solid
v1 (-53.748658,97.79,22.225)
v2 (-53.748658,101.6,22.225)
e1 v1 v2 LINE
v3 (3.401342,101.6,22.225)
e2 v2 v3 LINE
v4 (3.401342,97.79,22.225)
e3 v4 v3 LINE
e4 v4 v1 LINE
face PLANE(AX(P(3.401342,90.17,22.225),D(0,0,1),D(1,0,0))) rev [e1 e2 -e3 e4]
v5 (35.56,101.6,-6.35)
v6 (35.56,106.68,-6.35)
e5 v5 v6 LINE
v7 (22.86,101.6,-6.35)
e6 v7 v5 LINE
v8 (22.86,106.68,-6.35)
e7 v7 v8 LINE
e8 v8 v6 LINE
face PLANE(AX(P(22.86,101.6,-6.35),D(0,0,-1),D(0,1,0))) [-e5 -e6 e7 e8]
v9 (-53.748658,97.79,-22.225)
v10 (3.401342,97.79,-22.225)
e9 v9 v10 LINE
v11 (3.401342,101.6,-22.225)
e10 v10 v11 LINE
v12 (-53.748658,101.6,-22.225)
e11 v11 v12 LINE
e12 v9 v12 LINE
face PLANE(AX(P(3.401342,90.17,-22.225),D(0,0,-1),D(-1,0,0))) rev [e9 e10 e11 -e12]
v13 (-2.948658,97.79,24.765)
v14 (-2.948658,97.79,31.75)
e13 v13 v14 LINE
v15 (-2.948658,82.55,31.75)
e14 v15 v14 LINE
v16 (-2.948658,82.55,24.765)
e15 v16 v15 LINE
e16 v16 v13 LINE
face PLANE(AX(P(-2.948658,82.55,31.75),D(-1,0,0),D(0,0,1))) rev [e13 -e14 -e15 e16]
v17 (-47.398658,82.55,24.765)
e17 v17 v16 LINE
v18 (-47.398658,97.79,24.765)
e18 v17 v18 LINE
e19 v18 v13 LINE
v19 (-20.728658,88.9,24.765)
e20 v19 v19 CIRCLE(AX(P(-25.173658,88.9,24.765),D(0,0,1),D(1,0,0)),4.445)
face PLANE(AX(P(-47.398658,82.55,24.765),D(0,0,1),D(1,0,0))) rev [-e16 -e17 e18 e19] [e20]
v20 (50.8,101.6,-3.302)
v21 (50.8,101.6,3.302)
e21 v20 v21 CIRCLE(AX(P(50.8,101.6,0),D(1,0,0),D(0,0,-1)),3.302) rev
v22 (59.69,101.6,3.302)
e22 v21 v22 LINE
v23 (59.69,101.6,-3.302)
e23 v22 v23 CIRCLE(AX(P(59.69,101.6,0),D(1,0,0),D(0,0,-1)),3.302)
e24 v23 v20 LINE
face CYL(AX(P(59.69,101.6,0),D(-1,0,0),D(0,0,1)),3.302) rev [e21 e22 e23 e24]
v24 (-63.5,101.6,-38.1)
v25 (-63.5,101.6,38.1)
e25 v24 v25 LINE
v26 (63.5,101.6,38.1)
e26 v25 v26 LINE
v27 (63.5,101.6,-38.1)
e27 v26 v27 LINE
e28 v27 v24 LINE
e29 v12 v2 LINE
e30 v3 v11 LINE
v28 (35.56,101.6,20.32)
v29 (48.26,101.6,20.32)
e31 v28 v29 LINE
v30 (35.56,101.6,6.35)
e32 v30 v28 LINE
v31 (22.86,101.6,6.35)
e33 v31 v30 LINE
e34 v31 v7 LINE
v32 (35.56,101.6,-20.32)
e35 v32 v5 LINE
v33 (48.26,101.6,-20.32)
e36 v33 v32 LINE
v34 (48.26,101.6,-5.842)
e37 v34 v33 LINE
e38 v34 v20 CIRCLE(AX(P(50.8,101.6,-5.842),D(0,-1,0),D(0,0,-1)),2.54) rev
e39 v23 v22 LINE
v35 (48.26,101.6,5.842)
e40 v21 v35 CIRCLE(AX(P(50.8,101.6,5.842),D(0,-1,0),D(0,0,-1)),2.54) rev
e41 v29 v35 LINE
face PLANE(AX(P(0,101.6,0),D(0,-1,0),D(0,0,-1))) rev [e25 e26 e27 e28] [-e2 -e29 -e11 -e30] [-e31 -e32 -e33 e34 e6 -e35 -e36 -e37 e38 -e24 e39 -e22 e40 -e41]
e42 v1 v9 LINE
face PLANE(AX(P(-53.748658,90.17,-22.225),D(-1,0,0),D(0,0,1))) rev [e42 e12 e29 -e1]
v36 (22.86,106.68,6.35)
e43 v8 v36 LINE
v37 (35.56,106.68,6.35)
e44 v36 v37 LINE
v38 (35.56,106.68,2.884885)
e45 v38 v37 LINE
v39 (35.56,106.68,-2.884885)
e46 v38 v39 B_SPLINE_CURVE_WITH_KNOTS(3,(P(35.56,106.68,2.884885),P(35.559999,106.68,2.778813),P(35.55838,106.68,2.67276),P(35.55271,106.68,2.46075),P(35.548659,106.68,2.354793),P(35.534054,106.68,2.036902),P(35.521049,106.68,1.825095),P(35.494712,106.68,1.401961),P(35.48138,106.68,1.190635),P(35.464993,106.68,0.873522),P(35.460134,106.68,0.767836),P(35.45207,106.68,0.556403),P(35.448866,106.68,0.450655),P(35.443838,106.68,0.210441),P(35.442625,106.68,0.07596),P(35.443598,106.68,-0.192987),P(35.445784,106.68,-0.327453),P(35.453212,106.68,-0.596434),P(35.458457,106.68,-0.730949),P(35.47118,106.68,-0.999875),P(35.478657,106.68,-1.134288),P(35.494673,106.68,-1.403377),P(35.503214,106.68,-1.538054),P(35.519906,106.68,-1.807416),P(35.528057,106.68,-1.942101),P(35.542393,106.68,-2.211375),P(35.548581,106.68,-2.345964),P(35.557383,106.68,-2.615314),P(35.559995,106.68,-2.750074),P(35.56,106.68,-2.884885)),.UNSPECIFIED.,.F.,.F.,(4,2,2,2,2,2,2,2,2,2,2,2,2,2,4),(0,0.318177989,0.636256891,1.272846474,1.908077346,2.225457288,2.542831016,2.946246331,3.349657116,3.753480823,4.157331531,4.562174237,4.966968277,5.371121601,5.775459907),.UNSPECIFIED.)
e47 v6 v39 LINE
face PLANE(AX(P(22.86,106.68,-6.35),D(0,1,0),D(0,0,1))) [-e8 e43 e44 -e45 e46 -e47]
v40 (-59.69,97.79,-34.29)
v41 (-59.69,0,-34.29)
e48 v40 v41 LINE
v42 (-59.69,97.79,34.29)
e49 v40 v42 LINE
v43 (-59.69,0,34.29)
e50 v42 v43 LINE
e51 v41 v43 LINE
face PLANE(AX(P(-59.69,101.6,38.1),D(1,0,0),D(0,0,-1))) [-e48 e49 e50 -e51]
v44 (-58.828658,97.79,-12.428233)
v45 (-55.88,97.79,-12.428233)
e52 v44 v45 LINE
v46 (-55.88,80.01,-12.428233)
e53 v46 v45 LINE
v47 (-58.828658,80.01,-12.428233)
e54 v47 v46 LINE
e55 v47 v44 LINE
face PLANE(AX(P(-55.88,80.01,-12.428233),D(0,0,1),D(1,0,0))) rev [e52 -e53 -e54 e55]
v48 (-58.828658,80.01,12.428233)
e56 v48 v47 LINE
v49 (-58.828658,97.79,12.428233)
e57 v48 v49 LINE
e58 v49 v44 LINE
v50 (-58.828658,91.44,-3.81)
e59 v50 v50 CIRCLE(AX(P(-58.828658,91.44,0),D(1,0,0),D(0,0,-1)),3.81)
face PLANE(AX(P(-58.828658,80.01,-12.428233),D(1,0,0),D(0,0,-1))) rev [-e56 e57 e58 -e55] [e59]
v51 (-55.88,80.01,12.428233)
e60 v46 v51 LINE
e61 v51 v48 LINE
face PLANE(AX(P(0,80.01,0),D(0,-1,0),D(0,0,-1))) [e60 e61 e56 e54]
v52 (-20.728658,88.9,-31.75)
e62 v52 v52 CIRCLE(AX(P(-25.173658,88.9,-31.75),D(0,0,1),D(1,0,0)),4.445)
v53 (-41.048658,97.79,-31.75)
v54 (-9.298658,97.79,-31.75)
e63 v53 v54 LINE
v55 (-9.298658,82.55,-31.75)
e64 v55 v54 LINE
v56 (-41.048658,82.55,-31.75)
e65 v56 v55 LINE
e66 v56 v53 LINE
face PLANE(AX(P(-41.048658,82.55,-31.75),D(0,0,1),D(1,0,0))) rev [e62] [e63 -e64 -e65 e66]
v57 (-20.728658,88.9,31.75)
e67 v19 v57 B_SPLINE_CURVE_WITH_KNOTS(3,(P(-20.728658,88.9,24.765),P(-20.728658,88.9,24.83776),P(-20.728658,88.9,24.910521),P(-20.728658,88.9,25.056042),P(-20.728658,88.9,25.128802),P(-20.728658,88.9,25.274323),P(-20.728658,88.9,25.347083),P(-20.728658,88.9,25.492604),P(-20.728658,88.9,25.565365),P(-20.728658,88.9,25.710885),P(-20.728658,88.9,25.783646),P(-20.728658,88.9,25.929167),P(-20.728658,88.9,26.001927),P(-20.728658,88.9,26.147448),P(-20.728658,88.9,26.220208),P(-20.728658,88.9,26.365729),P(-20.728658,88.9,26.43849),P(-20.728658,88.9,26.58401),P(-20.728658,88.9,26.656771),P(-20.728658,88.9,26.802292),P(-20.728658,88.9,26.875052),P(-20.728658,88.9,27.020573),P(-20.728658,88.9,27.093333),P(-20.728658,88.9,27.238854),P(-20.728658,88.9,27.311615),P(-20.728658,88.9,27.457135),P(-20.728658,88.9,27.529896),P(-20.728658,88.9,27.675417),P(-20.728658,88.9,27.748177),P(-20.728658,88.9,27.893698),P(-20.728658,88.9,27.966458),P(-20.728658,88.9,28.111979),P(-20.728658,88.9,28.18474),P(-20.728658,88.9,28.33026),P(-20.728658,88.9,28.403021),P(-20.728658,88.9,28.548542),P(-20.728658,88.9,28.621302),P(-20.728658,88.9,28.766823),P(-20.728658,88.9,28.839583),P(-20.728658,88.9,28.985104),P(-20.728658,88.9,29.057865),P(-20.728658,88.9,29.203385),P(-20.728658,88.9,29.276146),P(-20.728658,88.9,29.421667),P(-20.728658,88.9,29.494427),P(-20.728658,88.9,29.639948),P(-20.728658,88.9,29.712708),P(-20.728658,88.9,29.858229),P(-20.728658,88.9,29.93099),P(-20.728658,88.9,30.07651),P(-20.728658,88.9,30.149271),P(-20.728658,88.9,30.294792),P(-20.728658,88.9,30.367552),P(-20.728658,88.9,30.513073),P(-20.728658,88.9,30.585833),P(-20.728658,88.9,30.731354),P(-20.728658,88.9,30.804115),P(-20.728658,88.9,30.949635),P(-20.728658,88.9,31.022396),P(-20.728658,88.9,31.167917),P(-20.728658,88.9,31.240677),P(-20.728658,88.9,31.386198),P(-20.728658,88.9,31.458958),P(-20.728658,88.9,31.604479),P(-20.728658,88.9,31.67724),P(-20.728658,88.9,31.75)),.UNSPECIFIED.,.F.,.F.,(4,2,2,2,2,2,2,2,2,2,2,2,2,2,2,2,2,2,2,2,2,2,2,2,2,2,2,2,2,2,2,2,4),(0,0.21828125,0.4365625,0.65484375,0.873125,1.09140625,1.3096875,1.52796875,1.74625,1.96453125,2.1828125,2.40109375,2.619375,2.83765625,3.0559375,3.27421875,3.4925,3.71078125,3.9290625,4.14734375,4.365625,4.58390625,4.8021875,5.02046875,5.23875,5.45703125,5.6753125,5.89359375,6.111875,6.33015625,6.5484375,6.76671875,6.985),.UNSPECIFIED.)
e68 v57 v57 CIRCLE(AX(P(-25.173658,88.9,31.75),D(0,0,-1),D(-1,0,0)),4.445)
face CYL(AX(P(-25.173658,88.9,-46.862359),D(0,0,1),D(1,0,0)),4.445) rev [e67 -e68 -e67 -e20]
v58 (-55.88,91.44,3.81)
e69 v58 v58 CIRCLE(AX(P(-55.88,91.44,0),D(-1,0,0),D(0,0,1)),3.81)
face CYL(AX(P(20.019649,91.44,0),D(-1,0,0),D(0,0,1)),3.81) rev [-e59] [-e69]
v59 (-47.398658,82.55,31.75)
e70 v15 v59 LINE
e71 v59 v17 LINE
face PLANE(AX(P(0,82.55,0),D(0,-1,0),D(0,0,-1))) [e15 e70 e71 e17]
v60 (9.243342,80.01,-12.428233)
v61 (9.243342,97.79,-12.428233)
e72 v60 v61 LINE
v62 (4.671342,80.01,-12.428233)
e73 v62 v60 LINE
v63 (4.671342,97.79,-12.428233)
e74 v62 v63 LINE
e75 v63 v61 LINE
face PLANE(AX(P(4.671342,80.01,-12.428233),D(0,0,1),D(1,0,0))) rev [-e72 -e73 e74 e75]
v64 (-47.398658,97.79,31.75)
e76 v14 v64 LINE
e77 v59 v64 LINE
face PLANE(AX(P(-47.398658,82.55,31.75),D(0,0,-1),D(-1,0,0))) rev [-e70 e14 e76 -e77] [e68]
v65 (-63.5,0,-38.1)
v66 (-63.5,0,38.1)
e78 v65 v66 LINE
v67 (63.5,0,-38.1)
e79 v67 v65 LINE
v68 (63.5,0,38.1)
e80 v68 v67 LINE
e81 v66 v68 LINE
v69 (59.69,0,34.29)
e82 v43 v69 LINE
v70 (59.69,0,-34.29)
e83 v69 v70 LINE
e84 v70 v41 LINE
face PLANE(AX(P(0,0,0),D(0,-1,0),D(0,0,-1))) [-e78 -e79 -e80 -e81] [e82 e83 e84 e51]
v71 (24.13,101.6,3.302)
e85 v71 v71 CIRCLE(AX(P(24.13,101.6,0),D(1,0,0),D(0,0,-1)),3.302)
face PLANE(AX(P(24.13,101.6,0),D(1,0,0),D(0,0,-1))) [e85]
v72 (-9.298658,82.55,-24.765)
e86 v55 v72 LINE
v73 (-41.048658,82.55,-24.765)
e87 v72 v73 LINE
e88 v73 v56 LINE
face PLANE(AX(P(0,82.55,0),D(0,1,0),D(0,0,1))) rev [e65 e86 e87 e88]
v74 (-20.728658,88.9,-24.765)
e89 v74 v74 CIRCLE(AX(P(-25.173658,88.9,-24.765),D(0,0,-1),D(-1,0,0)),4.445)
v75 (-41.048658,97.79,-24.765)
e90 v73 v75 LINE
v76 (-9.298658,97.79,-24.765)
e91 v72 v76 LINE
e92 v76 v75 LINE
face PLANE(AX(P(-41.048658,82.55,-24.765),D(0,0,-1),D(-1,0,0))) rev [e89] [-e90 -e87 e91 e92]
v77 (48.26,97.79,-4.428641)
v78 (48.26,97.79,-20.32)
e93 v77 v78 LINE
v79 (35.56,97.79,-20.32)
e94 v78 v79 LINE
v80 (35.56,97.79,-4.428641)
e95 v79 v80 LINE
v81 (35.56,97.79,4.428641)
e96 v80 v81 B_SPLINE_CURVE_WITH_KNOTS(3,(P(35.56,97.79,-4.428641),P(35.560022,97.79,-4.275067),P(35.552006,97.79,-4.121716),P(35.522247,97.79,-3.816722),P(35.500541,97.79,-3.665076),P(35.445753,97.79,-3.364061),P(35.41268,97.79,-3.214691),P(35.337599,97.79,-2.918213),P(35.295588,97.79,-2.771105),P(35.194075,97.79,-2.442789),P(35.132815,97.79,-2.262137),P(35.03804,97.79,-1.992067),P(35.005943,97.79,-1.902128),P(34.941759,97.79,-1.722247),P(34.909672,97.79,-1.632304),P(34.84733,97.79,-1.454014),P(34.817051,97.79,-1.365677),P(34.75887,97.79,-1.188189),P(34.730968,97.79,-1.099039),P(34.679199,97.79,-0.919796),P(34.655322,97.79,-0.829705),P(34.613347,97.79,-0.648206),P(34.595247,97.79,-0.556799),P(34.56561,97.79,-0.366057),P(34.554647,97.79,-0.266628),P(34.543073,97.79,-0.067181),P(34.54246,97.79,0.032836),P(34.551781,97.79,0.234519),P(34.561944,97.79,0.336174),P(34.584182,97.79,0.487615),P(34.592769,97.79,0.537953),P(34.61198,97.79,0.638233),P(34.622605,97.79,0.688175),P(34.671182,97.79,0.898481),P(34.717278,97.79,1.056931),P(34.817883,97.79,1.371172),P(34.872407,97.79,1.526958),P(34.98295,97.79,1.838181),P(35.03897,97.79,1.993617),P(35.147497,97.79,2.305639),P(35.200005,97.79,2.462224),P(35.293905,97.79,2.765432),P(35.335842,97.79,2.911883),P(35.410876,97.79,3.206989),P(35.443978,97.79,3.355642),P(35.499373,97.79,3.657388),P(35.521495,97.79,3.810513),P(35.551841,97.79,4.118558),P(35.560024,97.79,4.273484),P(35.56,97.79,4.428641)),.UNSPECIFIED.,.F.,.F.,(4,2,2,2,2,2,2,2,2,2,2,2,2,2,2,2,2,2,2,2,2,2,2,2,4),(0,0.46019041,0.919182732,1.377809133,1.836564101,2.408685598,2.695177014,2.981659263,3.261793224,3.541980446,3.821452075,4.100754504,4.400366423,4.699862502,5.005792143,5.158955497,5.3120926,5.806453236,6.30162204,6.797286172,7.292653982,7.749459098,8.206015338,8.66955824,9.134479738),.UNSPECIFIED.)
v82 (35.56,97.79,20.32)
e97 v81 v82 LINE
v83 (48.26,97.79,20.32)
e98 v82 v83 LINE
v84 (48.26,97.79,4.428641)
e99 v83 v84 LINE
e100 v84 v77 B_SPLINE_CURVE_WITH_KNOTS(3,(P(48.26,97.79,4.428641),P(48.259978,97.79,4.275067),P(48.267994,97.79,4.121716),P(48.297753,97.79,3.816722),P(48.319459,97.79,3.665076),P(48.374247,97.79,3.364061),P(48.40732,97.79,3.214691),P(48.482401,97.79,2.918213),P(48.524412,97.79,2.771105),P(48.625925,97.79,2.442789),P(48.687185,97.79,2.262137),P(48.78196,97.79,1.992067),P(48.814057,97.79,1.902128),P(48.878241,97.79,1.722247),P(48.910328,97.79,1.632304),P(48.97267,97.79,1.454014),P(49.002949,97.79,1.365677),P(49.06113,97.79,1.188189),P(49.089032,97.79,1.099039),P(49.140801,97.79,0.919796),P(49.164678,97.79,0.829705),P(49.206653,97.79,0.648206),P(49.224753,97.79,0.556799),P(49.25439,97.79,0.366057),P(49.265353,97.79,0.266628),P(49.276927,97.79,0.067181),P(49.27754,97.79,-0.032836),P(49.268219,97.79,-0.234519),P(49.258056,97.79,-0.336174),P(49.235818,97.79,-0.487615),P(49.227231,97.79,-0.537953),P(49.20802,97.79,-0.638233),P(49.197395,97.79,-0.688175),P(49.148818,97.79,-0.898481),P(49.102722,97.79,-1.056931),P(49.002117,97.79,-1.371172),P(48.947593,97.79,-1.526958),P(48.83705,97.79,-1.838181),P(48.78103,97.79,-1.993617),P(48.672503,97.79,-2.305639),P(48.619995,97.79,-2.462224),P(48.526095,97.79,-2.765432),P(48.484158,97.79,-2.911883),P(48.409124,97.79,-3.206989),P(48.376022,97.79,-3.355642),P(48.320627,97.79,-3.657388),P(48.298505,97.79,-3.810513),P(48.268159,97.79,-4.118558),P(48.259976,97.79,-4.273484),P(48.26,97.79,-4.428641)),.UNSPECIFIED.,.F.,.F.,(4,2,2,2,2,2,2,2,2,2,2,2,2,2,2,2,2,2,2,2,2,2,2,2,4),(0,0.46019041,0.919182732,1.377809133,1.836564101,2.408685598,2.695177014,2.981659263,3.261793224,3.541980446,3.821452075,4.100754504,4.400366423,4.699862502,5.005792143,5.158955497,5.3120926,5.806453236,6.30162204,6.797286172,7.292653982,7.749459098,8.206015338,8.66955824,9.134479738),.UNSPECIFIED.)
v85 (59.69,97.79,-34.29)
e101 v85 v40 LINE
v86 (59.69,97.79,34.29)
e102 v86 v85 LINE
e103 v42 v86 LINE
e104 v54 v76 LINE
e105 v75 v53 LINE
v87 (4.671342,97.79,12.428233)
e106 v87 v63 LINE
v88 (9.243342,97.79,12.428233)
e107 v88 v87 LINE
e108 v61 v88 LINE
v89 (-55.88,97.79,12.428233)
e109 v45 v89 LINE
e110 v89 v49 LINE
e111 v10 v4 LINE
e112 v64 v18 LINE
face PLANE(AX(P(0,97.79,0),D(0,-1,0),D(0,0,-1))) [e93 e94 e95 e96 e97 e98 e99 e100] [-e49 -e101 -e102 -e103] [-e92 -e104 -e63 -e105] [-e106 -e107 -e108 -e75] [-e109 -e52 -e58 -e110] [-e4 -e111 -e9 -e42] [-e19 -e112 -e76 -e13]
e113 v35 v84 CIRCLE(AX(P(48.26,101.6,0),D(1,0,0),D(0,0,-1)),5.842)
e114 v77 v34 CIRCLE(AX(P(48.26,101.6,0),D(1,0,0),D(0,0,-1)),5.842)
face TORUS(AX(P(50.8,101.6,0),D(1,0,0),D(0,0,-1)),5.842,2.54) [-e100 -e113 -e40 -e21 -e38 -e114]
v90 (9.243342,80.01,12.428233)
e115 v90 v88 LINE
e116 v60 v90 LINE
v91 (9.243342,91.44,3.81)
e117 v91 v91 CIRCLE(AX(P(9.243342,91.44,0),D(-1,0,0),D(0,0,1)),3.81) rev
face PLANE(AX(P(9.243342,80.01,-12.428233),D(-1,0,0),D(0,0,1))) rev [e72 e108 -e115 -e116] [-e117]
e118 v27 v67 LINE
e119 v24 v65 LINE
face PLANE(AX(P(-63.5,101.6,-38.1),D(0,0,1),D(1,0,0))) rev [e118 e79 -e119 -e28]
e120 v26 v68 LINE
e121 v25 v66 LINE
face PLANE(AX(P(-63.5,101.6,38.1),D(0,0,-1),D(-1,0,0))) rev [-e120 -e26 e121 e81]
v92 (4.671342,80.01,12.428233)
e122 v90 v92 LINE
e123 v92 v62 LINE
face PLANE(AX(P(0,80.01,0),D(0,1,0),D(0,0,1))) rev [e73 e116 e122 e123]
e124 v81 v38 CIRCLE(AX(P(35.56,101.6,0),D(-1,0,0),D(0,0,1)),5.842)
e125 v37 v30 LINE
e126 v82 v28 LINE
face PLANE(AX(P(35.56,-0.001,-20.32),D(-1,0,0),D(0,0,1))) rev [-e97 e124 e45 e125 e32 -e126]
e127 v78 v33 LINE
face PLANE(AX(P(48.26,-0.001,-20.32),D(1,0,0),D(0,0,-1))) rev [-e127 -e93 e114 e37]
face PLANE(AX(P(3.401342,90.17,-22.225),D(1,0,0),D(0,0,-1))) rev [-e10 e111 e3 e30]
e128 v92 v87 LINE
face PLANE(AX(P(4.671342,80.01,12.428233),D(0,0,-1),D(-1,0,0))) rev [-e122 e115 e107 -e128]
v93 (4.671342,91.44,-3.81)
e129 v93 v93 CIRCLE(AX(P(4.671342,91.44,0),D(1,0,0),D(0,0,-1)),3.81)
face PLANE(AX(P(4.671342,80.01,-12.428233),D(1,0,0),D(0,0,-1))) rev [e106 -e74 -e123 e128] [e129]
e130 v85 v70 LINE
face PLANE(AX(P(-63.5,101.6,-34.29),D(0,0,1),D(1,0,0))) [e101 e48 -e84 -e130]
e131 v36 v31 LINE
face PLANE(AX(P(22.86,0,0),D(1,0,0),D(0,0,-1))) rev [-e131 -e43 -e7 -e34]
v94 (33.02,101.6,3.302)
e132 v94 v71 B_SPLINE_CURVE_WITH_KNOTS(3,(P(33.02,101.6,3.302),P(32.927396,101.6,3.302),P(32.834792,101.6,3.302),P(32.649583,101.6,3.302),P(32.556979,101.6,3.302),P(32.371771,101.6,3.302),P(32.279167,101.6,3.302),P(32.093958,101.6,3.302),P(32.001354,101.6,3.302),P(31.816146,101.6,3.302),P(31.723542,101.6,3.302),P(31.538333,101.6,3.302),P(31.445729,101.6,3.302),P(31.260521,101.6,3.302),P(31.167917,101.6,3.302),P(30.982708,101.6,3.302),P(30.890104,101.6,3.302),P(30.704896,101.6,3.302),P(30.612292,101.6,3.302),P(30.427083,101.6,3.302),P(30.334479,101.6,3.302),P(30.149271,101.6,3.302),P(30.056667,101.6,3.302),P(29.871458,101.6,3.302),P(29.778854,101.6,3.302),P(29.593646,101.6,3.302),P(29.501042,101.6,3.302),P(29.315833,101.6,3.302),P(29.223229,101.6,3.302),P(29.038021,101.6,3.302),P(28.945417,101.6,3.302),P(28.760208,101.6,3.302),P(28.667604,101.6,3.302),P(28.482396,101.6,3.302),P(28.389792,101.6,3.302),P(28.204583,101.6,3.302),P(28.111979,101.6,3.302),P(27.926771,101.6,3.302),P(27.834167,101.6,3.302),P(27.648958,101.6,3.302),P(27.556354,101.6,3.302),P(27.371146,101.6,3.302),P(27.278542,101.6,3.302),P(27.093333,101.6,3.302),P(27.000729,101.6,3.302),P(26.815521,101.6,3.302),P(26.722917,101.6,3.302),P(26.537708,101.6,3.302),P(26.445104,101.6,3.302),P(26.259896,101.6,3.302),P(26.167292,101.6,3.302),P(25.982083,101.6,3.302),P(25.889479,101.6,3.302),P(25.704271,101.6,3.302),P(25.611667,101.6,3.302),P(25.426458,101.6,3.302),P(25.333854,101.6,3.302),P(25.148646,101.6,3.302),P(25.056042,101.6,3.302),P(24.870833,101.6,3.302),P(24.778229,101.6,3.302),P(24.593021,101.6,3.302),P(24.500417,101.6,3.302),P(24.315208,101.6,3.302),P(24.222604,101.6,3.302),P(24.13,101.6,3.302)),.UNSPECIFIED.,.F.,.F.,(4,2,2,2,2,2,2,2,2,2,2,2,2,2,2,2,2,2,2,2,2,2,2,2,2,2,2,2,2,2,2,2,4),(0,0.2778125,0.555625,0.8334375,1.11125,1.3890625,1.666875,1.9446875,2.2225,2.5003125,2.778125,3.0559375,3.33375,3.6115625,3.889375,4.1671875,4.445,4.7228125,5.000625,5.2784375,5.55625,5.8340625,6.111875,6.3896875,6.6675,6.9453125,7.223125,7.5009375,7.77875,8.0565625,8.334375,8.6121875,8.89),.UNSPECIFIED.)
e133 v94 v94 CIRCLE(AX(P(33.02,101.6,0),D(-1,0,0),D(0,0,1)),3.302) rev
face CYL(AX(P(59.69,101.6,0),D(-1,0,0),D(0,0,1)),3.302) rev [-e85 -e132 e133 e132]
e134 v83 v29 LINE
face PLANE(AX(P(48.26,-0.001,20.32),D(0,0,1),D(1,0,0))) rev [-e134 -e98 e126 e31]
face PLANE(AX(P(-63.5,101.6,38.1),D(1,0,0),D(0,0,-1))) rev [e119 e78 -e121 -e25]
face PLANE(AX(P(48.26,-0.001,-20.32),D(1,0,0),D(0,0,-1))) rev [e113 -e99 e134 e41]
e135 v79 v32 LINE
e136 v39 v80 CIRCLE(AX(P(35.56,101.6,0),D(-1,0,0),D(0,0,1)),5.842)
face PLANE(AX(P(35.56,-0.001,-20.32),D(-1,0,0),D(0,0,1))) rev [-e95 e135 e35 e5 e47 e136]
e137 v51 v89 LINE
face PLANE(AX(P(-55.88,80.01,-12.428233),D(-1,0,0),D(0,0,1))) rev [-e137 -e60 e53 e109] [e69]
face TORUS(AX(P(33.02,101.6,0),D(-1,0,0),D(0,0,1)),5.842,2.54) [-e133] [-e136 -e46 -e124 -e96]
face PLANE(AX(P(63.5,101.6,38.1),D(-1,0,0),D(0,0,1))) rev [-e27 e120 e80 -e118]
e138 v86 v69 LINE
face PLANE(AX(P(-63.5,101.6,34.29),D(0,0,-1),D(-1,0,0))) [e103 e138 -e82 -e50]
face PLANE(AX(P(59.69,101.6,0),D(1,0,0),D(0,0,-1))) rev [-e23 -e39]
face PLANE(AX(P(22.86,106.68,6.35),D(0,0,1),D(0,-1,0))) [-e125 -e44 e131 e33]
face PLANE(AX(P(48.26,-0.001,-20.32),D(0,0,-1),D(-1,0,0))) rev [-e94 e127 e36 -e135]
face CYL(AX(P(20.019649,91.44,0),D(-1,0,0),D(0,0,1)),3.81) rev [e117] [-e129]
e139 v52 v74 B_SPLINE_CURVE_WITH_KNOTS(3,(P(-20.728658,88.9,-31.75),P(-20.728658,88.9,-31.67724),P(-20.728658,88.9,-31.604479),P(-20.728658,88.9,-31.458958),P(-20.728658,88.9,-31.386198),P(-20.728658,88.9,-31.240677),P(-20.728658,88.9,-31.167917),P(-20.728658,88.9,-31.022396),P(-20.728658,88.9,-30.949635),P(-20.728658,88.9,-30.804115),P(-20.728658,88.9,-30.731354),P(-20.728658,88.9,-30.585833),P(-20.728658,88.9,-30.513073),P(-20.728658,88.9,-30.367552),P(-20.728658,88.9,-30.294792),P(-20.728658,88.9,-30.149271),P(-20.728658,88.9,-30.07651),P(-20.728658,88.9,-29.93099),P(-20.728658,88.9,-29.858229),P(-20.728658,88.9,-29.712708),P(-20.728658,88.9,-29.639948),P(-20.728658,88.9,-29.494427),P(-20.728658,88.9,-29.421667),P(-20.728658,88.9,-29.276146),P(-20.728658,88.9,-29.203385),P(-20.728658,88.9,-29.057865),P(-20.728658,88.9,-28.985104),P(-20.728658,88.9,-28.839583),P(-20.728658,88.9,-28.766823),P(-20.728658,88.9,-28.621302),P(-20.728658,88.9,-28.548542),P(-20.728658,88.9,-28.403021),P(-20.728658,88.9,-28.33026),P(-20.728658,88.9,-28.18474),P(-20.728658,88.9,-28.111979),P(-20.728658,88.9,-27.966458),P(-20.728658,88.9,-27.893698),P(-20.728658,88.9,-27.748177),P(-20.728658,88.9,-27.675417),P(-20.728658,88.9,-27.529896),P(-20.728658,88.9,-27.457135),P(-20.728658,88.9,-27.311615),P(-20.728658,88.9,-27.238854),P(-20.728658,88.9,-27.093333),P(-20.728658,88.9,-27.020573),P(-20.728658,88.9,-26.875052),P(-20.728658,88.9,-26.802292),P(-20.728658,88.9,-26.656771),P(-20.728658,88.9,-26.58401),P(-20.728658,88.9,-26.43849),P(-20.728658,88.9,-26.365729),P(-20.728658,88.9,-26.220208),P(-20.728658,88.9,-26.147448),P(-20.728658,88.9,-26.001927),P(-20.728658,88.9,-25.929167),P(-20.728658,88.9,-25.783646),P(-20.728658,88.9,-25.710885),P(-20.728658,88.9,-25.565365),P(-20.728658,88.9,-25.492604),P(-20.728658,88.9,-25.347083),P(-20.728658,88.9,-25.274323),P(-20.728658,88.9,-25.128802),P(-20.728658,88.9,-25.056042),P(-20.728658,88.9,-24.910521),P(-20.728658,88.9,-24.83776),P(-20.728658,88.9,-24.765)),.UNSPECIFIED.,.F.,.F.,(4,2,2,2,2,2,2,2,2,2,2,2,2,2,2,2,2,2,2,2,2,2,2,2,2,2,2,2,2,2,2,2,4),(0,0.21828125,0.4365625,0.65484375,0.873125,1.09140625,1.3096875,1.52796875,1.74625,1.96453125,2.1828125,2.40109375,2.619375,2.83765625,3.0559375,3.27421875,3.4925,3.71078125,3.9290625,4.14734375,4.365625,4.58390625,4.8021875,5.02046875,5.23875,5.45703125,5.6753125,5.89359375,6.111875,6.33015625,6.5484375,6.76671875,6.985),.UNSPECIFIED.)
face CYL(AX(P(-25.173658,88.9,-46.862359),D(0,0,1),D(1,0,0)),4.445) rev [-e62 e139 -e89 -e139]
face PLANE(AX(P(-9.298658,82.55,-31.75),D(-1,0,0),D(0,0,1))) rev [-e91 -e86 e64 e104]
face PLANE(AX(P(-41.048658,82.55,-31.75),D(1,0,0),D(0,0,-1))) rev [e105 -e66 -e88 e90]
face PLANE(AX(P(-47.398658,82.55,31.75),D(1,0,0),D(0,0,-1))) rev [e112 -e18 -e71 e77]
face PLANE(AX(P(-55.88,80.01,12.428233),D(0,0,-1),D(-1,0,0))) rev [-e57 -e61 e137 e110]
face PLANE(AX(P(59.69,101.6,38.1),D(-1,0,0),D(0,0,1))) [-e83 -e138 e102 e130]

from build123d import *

# Parameters (mm, degrees)
SKETCH1_W                           = 127
SKETCH1_H                           = 76.2
MAIN_BODY_DEPTH                     = 101.6
HOLLOW_IT_T                         = -3.81
HOLE_FOR_SCROLLWHEEL_REACH          = 127.724
SKETCH2_W                           = 12.7
SKETCH2_H                           = 40.64
NIBBLE_BASE_HOLE_DEPTH              = 12.7
NIBBLE_HOLE_DEPTH                   = 24.13
NIBBLE_HOLE_DEPTH_BACK              = 11.43
SKETCH5_R                           = 3.302
EASY_TO_INSERT_SCROLL_WHEEL_R       = 2.54
SKETCH6_W                           = 57.15
SKETCH6_H                           = 44.45
HOLE_FOR_JOYSTICK_DEPTH             = 11.43
SKETCH10_W                          = 44.45
SKETCH10_H                          = 6.985
SKETCH10_W_2                        = 31.75
BOX_NIBBLE_BASE_DEPTH               = 15.24
SKETCH11_W                          = 4.572
SKETCH11_H                          = 24.856466434
SKETCH11_W_2                        = 2.948658359
ARCH_NIBBLE_BASE_DEPTH              = 17.78
ARCH_NIBBLE_HOLES_REACH             = 134.21
SKETCH12_R                          = 3.81
ARCH_NIBBLE_HOLES_DIRECTION_2_REACH = 134.21
BOX_NIBBLE_HOLES_REACH              = 141.158
SKETCH13_R                          = 4.445
BOX_NIBBLE_HOLES_DIRECTION_2_REACH  = 141.158


with BuildPart() as part:
    # Sketch1 → main body (new body)
    with BuildSketch(Plane(origin=(0, 0, 0), x_dir=(1, 0, 0), z_dir=(0, 1, 0))):
        Rectangle(SKETCH1_W, SKETCH1_H)
    extrude(amount=MAIN_BODY_DEPTH)

    # hollow it
    hollow_it_openings = [part.faces().sort_by_distance(p)[0] for p in [
        (0, 0, 0),
    ]]
    offset(amount=HOLLOW_IT_T, openings=hollow_it_openings, kind=Kind.INTERSECTION)

    # Sketch2 → hole for scrollwheel (cut, up to next)
    with BuildSketch(Plane(origin=(0, 101.6, 0), x_dir=(1, 0, 0), z_dir=(0, 1, 0)), mode=Mode.PRIVATE) as hole_for_scrollwheel_sk1:
        with Locations((41.91, 0)):
            Rectangle(SKETCH2_W, SKETCH2_H)
    hole_for_scrollwheel_tool1 = extrude(hole_for_scrollwheel_sk1.sketch, amount=-HOLE_FOR_SCROLLWHEEL_REACH, mode=Mode.PRIVATE) & part.part
    add(hole_for_scrollwheel_tool1.solids().sort_by_distance((41.91, 101.6, 0))[0], mode=Mode.SUBTRACT)

    # Sketch3 → nibble base hole (add)
    with BuildSketch(Plane(origin=(35.56, 0, 0), x_dir=(0, 0, -1), z_dir=(1, 0, 0))):
        Polygon((0, 101.6), (6.35, 101.6), (6.35, 106.68), (-6.35, 106.68), (-6.35, 101.6), align=None)
    extrude(amount=-NIBBLE_BASE_HOLE_DEPTH)

    # Sketch5 → nibble hole (cut, two sides: drawn at the far end of the back side and taken through both)
    with BuildSketch(Plane(origin=(35.56, 0, 0), x_dir=(0, 0, -1), z_dir=(1, 0, 0)).offset(-NIBBLE_HOLE_DEPTH_BACK)):
        with Locations(Location((0, 101.6, 0), (0, 0, 180))):
            Circle(SKETCH5_R)
    extrude(amount=NIBBLE_HOLE_DEPTH + NIBBLE_HOLE_DEPTH_BACK, mode=Mode.SUBTRACT)

    # easy to insert scroll wheel
    # the kernel refuses this fillet: 2.54 mm, written as the material it takes off along each edge
    with BuildSketch(Plane(origin=(48.26, 101.6, 0), x_dir=(0, 0.9999950652018582, -0.0031415874858792044), z_dir=(0, 0.0031415874858792044, 0.9999950652018582))) as easy_to_insert_scroll_wheel_piece_1:
        with BuildLine():
            CenterArc((3.302 + EASY_TO_INSERT_SCROLL_WHEEL_R, -EASY_TO_INSERT_SCROLL_WHEEL_R), EASY_TO_INSERT_SCROLL_WHEEL_R, 90, 90)
            Line((3.302, -EASY_TO_INSERT_SCROLL_WHEEL_R), (3.302, 0))
            Line((3.302, 0), (3.302 + EASY_TO_INSERT_SCROLL_WHEEL_R, 0))
        make_face()
    revolve(axis=Axis((48.26, 101.6, 0), (-1, 0, 0)), revolution_arc=359.64, mode=Mode.SUBTRACT)
    with BuildSketch(Plane(origin=(35.56, 101.6, 0), x_dir=(0, 0, 1), z_dir=(0, 1, 0))) as easy_to_insert_scroll_wheel_piece_2:
        with BuildLine():
            CenterArc((3.302 + EASY_TO_INSERT_SCROLL_WHEEL_R, -EASY_TO_INSERT_SCROLL_WHEEL_R), EASY_TO_INSERT_SCROLL_WHEEL_R, 90, 90)
            Line((3.302, -EASY_TO_INSERT_SCROLL_WHEEL_R), (3.302, 0))
            Line((3.302, 0), (3.302 + EASY_TO_INSERT_SCROLL_WHEEL_R, 0))
        make_face()
    revolve(axis=Axis((35.56, 101.6, 0), (1, 0, 0)), mode=Mode.SUBTRACT)

    # Sketch6 → hole for joystick (cut)
    with BuildSketch(Plane(origin=(0, 101.6, 0), x_dir=(1, 0, 0), z_dir=(0, 1, 0))):
        with Locations((-25.173658359, 0)):
            Rectangle(SKETCH6_W, SKETCH6_H)
    extrude(amount=-HOLE_FOR_JOYSTICK_DEPTH, mode=Mode.SUBTRACT)

    # Sketch10 → box nibble base (add)
    with BuildSketch(Plane.XZ.offset(-97.79)):
        with Locations((-25.173658359, 28.2575)):
            Rectangle(SKETCH10_W, SKETCH10_H)
        with Locations((-25.173658359, -28.2575)):
            Rectangle(SKETCH10_W_2, SKETCH10_H)
    extrude(amount=BOX_NIBBLE_BASE_DEPTH)

    # Sketch11 → arch nibble base (add)
    with BuildSketch(Plane.XZ.offset(-97.79)):
        with Locations((6.957341641, 0)):
            Rectangle(SKETCH11_W, SKETCH11_H)
        with Locations((-57.354329179, 0)):
            Rectangle(SKETCH11_W_2, SKETCH11_H)
    extrude(amount=ARCH_NIBBLE_BASE_DEPTH)

    # arch nibble holes: up to this face of the body (flat: up to its plane)
    arch_nibble_holes_end = Plane(part.part.faces().sort_by_distance((9.243341641, 88.9, 0))[0])
    # Sketch12 → arch nibble holes (cut, up to the picked face)
    with BuildSketch(Plane.ZY.offset(-4.671341641), mode=Mode.PRIVATE) as arch_nibble_holes_sk1:
        with Locations((0, 91.44)):
            Circle(SKETCH12_R)
    arch_nibble_holes_tool1 = split(extrude(arch_nibble_holes_sk1.sketch, amount=-ARCH_NIBBLE_HOLES_REACH, mode=Mode.PRIVATE), bisect_by=arch_nibble_holes_end, keep=Keep.BOTH, mode=Mode.PRIVATE)
    add(arch_nibble_holes_tool1.solids().sort_by(Axis((4.671342, 91.44, 0), (1, 0, 0)))[0], mode=Mode.SUBTRACT)

    # arch nibble holes direction 2: up to this face of the body (flat: up to its plane)
    arch_nibble_holes_direction_2_end = Plane(part.part.faces().sort_by_distance((-59.69, 48.895, 0))[0])
    # Sketch12 → arch nibble holes direction 2 (cut, up to the picked face)
    with BuildSketch(Plane.ZY.offset(-4.671341641), mode=Mode.PRIVATE) as arch_nibble_holes_direction_2_sk1:
        with Locations((0, 91.44)):
            Circle(SKETCH12_R)
    arch_nibble_holes_direction_2_tool1 = split(extrude(arch_nibble_holes_direction_2_sk1.sketch, amount=ARCH_NIBBLE_HOLES_DIRECTION_2_REACH, mode=Mode.PRIVATE), bisect_by=arch_nibble_holes_direction_2_end, keep=Keep.BOTH, mode=Mode.PRIVATE)
    add(arch_nibble_holes_direction_2_tool1.solids().sort_by(Axis((4.671342, 91.44, 0), (-1, 0, 0)))[0], mode=Mode.SUBTRACT)

    # box nibble holes: up to this face of the body (flat: up to its plane)
    box_nibble_holes_end = Plane(part.part.faces().sort_by_distance((0, 48.895, -34.29))[0])
    # Sketch13 → box nibble holes (cut, up to the picked face)
    with BuildSketch(Plane.XY.offset(-24.765), mode=Mode.PRIVATE) as box_nibble_holes_sk1:
        with Locations((-25.173658359, 88.9)):
            Circle(SKETCH13_R)
    box_nibble_holes_tool1 = split(extrude(box_nibble_holes_sk1.sketch, amount=-BOX_NIBBLE_HOLES_REACH, mode=Mode.PRIVATE), bisect_by=box_nibble_holes_end, keep=Keep.BOTH, mode=Mode.PRIVATE)
    add(box_nibble_holes_tool1.solids().sort_by(Axis((-25.173658, 88.9, -24.765), (0, 0, -1)))[0], mode=Mode.SUBTRACT)

    # box nibble holes direction 2: up to this face of the body (flat: up to its plane)
    box_nibble_holes_direction_2_end = Plane(part.part.faces().sort_by_distance((0, 48.895, 34.29))[0])
    # Sketch13 → box nibble holes direction 2 (cut, up to the picked face)
    with BuildSketch(Plane.XY.offset(-24.765), mode=Mode.PRIVATE) as box_nibble_holes_direction_2_sk1:
        with Locations((-25.173658359, 88.9)):
            Circle(SKETCH13_R)
    box_nibble_holes_direction_2_tool1 = split(extrude(box_nibble_holes_direction_2_sk1.sketch, amount=BOX_NIBBLE_HOLES_DIRECTION_2_REACH, mode=Mode.PRIVATE), bisect_by=box_nibble_holes_direction_2_end, keep=Keep.BOTH, mode=Mode.PRIVATE)
    add(box_nibble_holes_direction_2_tool1.solids().sort_by(Axis((-25.173658, 88.9, -24.765), (0, 0, 1)))[0], mode=Mode.SUBTRACT)


solid = part.part
